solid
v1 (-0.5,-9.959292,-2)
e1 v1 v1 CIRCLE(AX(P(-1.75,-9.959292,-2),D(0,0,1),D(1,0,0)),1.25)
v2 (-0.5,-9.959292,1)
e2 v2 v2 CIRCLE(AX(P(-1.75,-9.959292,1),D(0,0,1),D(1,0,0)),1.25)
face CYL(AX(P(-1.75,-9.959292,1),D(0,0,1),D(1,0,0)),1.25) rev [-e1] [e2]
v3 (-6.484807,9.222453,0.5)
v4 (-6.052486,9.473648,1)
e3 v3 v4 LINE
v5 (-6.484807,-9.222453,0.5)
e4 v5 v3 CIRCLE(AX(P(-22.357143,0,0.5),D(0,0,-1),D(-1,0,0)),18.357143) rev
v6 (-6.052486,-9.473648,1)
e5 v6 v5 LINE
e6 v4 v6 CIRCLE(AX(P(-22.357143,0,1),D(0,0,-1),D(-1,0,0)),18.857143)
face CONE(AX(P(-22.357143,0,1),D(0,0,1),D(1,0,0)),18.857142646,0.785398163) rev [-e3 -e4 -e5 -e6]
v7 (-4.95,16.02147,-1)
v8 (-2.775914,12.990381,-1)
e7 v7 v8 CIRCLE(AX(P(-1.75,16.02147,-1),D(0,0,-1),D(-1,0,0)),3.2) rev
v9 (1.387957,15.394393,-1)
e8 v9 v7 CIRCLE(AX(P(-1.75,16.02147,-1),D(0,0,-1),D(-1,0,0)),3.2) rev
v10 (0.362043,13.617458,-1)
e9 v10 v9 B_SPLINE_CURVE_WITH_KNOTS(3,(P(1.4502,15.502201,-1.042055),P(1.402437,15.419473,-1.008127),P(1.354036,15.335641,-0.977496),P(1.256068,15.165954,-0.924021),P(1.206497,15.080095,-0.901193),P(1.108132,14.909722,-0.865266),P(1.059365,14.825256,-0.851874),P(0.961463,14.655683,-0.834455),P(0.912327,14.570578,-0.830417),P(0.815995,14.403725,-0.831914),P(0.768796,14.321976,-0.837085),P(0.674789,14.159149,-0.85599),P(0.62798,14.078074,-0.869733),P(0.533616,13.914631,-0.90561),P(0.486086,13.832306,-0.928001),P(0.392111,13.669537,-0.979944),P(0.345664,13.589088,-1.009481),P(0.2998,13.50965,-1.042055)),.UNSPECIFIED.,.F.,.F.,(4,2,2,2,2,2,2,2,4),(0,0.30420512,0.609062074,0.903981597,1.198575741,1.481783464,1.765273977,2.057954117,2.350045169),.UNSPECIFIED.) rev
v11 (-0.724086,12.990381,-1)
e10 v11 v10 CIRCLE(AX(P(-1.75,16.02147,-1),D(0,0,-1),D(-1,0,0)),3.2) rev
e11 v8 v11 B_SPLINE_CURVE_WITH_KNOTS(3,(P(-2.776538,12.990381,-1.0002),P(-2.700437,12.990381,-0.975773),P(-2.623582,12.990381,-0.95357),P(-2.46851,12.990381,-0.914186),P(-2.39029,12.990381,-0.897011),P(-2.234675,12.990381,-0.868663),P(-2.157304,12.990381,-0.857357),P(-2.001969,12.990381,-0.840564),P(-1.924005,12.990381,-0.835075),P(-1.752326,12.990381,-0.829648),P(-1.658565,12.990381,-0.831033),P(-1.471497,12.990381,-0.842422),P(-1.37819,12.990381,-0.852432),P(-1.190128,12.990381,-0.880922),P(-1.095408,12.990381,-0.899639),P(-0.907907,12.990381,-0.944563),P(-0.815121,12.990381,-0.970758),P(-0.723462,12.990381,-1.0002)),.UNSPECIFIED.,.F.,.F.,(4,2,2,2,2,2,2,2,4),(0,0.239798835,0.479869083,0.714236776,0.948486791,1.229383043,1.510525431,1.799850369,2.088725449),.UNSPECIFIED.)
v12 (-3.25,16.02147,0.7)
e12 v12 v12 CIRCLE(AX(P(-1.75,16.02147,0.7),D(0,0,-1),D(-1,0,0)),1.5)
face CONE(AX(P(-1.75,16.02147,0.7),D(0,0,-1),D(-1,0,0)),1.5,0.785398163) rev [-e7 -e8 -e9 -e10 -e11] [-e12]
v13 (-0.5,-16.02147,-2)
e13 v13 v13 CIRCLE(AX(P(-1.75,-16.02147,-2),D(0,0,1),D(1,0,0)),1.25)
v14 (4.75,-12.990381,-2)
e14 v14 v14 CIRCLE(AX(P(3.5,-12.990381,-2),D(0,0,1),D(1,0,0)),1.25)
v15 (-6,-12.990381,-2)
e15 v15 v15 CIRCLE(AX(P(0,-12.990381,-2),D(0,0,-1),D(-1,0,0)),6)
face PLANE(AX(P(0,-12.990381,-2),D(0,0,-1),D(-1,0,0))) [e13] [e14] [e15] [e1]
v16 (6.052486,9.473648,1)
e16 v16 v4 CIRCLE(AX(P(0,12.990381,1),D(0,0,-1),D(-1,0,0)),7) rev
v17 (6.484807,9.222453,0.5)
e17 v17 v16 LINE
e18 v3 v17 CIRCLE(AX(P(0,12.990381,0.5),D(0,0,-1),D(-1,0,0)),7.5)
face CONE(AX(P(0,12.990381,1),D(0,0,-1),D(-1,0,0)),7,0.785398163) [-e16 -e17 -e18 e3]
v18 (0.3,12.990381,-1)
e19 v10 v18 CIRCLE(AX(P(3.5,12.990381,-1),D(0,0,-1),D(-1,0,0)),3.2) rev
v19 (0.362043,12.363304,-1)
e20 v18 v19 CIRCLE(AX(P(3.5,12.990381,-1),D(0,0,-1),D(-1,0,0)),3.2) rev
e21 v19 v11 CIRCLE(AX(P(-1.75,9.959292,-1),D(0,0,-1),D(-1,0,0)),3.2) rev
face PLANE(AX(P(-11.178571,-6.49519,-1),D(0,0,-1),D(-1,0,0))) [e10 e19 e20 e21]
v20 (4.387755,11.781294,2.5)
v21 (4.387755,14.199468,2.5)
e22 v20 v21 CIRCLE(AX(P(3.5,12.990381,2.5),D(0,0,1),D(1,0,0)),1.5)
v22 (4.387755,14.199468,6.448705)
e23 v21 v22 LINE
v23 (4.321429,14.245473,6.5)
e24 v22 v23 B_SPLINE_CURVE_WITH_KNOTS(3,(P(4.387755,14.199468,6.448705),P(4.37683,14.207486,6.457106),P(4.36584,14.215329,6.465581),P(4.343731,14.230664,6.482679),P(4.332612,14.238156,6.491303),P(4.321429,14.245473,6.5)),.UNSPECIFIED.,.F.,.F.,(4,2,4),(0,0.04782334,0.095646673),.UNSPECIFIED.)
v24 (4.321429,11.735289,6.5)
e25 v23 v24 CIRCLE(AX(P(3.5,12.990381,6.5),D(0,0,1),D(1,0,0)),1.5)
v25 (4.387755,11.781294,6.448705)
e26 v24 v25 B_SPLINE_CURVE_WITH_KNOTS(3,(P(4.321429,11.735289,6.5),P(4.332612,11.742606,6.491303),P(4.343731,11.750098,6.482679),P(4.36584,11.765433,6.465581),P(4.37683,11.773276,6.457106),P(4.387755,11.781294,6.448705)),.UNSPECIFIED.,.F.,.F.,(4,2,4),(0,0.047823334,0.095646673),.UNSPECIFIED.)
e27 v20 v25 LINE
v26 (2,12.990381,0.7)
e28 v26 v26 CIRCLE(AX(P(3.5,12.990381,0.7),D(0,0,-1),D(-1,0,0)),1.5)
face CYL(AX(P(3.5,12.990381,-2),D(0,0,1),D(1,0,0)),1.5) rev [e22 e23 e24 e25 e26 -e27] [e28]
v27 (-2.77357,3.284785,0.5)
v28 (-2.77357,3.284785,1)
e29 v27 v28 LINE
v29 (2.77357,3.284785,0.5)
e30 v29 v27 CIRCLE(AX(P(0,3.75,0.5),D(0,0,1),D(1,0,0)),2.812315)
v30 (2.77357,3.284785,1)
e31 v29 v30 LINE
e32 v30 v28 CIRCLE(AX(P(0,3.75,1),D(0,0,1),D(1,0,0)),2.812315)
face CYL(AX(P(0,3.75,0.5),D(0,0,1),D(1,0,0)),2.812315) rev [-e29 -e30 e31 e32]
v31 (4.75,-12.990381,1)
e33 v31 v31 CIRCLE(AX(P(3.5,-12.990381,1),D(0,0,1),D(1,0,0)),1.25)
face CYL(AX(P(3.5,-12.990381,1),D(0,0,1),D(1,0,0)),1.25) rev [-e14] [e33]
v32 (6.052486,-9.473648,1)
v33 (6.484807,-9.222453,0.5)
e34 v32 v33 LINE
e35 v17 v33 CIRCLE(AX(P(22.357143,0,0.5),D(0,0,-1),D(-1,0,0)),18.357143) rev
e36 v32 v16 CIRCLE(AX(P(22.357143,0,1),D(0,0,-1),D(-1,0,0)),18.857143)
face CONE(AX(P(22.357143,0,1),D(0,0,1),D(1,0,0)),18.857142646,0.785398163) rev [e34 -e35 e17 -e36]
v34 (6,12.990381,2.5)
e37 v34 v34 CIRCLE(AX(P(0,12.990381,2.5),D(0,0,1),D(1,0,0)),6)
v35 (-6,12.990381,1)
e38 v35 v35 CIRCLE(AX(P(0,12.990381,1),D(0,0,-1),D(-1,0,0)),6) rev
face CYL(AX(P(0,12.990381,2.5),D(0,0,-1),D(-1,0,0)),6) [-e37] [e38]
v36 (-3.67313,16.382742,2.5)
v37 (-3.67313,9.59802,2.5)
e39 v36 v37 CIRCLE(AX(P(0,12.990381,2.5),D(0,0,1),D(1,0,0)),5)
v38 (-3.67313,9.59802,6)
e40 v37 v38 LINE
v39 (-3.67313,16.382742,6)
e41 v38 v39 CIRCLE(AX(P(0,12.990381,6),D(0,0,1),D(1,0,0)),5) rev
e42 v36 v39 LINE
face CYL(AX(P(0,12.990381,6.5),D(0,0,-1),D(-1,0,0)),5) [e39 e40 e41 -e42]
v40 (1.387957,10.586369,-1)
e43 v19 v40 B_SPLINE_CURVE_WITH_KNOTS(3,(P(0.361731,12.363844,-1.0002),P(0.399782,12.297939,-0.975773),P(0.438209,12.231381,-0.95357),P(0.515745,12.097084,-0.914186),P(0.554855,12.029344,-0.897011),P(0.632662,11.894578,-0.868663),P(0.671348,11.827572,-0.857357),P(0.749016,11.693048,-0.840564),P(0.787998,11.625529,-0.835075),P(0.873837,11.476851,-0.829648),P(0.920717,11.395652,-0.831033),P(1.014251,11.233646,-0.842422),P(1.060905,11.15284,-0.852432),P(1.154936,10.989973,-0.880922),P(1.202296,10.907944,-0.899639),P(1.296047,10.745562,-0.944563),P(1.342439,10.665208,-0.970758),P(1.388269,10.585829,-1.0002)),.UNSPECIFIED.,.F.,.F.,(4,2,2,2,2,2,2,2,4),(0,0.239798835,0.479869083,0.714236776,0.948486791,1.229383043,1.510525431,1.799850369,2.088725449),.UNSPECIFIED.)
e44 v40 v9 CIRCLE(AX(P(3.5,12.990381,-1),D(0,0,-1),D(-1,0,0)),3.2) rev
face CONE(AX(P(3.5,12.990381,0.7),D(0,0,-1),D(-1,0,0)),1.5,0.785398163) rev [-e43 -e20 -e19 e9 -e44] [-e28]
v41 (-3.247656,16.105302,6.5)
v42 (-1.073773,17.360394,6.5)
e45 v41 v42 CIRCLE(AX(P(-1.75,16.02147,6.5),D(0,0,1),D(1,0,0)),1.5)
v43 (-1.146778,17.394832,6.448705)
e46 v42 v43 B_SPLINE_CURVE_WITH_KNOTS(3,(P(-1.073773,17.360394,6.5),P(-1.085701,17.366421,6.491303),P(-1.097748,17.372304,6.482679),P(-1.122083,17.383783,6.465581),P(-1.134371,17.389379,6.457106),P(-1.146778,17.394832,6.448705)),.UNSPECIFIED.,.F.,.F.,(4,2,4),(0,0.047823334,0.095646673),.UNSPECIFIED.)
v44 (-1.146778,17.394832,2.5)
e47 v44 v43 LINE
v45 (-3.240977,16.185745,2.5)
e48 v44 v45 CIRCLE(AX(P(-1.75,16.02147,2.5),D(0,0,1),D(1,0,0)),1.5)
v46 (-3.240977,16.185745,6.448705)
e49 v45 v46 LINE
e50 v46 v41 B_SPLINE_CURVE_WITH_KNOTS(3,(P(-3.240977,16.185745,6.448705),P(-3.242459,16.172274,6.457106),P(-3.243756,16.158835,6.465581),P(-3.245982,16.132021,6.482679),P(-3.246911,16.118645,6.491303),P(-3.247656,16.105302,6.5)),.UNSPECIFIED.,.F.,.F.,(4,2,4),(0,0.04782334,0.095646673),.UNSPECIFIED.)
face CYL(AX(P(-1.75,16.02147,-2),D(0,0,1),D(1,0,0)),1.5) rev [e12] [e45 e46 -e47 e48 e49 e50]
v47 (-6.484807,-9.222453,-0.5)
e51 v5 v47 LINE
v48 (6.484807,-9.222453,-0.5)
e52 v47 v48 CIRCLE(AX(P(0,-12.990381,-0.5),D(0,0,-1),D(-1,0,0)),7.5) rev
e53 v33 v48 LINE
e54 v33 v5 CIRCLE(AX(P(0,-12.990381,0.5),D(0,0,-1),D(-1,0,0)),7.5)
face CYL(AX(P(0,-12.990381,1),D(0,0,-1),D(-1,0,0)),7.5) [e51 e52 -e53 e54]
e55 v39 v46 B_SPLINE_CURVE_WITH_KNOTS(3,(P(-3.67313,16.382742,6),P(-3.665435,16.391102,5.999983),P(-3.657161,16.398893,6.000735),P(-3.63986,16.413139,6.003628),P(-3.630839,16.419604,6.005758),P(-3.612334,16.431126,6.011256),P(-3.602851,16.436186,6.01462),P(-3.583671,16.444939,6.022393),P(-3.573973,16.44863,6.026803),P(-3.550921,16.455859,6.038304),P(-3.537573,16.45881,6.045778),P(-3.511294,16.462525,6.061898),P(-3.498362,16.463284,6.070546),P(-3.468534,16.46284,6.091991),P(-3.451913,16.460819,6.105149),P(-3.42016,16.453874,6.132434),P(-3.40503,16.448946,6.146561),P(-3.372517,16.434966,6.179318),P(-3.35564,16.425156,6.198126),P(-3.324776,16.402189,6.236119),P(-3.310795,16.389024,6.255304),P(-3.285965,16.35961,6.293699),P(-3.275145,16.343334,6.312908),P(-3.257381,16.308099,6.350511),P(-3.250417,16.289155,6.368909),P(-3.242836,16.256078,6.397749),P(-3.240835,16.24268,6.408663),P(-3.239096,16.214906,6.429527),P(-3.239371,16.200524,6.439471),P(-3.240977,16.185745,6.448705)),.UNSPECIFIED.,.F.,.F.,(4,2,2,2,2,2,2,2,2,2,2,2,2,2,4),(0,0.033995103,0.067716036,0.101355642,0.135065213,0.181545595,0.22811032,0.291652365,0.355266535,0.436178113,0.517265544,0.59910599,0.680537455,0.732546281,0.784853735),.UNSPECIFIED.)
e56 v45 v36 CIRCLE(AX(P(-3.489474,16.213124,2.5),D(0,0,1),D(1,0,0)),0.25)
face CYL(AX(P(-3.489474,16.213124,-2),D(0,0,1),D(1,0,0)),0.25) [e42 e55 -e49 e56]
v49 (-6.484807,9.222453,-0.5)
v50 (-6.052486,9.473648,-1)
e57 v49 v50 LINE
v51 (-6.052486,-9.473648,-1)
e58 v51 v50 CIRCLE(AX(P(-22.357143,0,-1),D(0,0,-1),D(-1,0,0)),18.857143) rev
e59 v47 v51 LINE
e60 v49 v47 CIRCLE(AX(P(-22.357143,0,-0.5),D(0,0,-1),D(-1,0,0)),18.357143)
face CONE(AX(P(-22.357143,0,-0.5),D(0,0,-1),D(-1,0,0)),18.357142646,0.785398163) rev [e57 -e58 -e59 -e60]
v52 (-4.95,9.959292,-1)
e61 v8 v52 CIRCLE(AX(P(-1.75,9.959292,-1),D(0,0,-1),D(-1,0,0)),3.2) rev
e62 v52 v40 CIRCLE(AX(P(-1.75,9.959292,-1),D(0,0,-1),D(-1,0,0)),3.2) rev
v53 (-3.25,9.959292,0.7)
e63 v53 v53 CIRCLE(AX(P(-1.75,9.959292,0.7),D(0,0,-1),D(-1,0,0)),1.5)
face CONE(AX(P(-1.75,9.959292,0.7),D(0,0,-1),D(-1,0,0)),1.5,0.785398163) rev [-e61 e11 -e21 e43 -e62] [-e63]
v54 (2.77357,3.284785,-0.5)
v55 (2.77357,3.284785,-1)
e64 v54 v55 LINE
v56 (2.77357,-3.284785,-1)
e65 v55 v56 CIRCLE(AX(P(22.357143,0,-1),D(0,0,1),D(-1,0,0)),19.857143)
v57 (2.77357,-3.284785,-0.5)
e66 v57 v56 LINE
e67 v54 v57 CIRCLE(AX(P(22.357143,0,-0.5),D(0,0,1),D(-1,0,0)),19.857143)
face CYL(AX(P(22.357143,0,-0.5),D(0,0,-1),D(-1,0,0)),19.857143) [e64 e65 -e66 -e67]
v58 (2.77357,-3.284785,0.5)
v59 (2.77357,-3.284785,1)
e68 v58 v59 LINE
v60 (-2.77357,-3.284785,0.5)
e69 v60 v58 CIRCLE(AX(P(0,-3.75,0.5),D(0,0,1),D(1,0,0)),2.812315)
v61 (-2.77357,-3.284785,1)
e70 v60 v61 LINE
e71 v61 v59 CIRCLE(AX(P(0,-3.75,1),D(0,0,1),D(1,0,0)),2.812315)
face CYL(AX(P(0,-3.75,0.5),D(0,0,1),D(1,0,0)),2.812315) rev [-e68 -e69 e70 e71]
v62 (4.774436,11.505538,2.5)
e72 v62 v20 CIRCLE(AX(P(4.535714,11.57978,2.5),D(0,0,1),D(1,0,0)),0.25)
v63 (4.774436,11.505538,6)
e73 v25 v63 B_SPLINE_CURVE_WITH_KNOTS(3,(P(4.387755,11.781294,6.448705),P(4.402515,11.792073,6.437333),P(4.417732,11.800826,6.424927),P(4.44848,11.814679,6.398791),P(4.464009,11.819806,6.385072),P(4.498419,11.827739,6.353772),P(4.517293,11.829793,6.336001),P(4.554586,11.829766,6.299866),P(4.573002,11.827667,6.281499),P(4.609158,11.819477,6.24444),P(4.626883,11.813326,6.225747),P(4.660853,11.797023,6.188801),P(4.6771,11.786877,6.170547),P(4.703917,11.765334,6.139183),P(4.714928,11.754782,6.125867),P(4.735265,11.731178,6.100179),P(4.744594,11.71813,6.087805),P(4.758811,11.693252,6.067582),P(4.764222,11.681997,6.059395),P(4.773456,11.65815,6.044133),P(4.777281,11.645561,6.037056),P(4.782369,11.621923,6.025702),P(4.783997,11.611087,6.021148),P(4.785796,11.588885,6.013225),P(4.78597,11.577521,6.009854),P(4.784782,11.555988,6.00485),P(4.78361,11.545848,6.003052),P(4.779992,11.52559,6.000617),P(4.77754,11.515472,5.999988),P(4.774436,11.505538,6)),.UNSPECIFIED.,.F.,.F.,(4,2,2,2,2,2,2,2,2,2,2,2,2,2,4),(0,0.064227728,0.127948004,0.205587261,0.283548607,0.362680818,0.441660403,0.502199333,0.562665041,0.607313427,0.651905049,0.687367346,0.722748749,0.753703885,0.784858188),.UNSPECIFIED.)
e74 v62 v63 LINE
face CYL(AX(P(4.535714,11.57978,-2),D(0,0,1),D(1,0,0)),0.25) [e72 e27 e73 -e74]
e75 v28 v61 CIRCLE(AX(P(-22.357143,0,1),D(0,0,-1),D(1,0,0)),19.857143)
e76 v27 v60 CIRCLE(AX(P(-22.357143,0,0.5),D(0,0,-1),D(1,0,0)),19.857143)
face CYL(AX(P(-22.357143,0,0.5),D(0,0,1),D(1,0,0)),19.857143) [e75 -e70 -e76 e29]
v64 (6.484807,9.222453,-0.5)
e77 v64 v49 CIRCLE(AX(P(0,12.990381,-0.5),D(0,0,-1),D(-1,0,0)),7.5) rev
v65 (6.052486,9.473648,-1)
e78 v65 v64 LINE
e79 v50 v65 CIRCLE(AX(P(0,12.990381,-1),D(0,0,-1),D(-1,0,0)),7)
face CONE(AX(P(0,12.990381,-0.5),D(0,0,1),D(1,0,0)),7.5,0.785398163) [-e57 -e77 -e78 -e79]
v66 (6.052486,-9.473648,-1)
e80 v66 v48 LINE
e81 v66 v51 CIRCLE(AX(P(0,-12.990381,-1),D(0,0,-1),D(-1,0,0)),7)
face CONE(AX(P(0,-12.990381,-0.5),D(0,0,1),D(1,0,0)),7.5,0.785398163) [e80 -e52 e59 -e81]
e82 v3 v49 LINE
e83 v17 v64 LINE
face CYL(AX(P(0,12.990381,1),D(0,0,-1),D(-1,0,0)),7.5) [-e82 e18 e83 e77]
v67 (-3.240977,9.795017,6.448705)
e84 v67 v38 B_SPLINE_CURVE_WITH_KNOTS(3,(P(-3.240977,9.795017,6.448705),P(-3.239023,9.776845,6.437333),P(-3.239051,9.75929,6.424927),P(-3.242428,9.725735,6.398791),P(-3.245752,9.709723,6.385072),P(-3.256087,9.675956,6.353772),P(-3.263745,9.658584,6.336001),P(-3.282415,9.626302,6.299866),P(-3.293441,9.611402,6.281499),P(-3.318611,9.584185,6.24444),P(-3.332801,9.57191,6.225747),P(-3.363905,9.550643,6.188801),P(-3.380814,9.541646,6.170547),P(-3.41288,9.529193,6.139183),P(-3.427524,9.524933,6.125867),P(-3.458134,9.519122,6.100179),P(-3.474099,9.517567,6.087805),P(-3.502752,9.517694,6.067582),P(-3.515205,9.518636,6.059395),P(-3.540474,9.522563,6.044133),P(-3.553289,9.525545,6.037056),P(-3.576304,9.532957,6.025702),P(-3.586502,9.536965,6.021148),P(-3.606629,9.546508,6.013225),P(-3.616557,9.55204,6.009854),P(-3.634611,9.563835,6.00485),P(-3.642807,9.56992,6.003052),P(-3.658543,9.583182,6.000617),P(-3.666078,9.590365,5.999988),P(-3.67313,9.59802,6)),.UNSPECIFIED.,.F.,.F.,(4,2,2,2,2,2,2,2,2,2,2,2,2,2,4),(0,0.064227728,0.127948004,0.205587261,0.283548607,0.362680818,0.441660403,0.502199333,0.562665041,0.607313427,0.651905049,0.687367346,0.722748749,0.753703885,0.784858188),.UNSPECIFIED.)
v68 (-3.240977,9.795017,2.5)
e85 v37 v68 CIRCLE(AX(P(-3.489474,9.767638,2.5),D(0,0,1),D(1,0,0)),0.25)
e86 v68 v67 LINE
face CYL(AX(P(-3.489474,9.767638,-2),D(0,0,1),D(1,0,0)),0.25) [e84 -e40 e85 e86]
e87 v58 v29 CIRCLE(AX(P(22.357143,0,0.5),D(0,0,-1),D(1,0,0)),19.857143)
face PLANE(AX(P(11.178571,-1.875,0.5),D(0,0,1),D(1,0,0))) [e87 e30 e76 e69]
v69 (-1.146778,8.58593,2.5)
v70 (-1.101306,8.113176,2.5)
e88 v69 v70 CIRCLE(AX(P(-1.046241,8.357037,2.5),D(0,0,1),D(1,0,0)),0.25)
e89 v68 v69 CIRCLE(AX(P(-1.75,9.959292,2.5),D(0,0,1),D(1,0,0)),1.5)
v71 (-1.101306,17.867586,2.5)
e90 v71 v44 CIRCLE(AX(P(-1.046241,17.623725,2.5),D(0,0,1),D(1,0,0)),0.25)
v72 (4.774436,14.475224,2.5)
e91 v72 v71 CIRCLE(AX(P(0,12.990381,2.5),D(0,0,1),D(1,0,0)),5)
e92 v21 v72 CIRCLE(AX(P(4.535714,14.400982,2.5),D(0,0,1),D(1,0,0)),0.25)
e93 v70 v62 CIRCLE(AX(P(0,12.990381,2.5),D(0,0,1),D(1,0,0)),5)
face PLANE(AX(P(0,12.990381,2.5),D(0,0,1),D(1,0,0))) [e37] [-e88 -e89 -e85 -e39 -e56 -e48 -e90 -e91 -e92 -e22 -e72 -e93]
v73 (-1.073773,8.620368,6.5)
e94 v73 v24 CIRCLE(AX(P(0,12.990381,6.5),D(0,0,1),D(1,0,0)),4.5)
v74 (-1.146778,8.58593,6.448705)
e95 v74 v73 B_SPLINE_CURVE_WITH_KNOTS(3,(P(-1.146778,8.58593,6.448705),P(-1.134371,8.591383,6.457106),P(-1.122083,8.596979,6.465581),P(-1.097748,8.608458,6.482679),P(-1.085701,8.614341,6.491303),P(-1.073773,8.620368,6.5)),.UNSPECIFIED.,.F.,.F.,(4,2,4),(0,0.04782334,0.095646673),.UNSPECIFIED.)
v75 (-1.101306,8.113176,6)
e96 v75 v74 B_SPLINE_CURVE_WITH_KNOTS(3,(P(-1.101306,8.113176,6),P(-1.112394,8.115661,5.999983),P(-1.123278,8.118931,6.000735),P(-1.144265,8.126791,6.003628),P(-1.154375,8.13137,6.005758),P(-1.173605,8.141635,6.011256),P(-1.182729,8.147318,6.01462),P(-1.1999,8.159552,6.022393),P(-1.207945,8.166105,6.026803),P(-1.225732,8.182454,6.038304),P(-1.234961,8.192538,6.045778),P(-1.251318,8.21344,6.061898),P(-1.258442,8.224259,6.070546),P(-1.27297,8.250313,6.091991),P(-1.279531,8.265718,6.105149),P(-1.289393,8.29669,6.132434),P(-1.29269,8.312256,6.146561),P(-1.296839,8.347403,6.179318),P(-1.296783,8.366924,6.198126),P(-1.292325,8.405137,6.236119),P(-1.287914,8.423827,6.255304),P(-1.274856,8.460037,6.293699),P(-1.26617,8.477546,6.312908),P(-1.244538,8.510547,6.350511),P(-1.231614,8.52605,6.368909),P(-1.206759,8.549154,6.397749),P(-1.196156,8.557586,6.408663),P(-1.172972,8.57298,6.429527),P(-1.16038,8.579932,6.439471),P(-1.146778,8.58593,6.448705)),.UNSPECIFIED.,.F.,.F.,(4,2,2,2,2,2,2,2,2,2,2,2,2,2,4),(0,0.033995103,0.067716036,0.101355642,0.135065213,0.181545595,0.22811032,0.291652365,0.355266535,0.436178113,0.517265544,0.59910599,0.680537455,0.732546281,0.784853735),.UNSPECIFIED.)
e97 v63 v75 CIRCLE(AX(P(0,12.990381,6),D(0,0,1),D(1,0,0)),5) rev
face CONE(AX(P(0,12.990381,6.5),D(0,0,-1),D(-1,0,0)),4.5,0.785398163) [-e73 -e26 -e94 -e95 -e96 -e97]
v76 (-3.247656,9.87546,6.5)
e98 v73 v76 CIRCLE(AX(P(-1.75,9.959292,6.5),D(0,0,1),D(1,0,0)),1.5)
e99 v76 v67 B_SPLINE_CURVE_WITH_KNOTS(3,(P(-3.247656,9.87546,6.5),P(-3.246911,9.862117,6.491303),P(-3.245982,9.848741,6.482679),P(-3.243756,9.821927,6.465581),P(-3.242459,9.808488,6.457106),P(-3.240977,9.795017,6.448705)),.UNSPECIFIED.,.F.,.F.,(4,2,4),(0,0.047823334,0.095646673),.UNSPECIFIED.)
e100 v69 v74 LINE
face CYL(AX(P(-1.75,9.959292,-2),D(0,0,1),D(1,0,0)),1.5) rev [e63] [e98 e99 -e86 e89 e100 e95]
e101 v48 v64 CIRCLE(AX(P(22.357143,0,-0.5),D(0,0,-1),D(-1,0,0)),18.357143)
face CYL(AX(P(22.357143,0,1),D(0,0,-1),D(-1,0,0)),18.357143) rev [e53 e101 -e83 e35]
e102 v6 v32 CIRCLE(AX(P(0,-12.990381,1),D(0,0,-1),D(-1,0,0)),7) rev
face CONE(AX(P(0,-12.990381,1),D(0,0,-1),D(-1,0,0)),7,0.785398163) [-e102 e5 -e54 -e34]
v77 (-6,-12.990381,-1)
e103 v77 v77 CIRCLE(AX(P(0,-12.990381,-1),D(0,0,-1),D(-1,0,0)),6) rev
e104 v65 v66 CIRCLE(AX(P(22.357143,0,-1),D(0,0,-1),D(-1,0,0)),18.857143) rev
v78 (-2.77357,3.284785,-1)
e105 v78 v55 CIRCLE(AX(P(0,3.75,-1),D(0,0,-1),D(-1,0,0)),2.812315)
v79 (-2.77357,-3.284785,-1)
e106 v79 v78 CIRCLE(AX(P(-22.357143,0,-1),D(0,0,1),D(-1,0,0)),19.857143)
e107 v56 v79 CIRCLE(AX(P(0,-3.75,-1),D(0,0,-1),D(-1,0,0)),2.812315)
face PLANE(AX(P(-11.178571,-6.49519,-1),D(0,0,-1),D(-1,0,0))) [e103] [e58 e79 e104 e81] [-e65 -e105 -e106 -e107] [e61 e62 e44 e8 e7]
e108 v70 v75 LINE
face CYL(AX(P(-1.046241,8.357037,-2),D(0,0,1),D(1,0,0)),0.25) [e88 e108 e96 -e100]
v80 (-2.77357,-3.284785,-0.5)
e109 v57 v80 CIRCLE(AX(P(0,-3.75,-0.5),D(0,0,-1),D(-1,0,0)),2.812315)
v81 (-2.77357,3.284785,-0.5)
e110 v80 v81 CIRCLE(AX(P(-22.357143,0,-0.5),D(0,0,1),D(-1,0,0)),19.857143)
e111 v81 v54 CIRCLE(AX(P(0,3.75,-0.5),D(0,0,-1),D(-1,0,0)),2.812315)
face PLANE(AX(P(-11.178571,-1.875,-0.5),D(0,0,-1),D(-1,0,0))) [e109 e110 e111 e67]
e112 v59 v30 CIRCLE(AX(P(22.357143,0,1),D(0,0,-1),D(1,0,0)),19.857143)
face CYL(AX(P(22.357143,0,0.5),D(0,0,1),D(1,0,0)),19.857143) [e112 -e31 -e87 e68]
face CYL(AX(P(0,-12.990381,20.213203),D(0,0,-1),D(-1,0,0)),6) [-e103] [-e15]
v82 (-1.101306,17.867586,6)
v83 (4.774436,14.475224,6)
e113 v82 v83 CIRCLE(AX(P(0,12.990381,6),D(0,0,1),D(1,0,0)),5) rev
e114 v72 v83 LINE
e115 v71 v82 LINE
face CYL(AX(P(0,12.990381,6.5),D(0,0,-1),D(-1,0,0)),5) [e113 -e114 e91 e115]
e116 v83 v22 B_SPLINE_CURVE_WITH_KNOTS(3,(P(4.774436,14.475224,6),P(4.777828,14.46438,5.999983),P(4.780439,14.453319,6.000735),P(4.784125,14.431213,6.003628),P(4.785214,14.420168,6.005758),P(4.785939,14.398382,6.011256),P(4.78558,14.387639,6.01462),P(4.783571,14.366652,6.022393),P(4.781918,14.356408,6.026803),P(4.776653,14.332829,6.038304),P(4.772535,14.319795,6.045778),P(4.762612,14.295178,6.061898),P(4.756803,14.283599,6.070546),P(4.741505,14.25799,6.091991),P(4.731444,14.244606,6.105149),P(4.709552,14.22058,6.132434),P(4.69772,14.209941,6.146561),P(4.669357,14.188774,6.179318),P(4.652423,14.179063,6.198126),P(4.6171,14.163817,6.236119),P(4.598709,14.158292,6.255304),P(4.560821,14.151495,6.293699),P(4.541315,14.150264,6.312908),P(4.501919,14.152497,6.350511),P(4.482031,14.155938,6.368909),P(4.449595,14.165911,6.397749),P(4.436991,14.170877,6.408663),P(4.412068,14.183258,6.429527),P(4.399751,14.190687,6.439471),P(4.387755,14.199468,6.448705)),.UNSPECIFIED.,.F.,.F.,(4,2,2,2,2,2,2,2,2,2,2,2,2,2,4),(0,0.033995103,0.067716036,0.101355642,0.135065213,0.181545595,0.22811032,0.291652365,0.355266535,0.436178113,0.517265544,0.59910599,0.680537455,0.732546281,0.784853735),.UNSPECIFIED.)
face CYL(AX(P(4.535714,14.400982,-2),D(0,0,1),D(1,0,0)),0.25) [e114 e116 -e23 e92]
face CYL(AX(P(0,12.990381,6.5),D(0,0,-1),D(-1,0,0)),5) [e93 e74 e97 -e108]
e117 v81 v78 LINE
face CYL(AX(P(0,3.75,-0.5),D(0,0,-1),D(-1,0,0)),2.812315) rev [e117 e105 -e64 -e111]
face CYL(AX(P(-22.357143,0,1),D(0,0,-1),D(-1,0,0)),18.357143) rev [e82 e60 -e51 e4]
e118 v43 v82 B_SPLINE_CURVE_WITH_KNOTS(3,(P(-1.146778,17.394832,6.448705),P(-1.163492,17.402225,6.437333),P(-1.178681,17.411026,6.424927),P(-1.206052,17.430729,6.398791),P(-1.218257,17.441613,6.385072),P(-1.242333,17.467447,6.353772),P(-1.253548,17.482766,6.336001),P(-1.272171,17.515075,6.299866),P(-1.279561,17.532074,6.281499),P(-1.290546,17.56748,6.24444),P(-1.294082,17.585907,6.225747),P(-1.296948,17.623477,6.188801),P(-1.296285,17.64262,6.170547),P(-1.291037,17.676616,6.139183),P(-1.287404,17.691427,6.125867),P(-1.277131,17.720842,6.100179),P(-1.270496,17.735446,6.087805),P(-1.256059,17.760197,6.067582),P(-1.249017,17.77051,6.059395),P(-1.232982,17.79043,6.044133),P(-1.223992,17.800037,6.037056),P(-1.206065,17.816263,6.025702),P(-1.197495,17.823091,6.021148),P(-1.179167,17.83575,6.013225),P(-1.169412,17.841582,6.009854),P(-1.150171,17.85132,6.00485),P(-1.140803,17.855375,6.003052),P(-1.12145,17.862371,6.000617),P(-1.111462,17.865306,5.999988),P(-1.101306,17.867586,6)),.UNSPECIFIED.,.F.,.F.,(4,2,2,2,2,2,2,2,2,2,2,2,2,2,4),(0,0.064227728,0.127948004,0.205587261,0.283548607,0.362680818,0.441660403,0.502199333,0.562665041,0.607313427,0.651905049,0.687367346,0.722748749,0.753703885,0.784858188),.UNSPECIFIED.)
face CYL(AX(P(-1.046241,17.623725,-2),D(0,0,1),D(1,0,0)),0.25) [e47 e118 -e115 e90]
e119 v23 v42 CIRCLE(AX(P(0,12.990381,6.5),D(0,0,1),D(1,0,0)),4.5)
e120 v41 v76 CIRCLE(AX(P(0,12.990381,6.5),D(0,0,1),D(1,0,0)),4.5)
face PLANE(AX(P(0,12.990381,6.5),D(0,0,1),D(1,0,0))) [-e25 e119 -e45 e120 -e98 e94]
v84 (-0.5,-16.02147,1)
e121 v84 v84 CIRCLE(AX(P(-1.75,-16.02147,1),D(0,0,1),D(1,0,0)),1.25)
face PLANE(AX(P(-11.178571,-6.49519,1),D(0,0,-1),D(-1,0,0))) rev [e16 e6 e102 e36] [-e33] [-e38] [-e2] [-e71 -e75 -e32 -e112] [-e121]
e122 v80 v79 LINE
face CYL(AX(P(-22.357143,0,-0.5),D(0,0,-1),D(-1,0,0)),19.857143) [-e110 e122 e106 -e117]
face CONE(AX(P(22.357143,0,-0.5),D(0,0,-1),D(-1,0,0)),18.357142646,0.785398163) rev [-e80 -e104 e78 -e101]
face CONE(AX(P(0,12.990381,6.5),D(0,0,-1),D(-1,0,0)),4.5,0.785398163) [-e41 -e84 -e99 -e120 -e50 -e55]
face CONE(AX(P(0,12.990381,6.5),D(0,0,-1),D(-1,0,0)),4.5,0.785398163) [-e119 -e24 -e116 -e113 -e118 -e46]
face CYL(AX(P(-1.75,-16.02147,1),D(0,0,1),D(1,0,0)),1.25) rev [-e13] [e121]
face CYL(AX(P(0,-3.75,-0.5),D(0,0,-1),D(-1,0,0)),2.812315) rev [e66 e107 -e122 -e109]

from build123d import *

# Parameters (mm, degrees)
EXTRUDE_1_DEPTH     = 1
SKETCH_2_R          = 6
EXTRUDE_2_DEPTH     = 1.5
SKETCH_3_R          = 7.5
EXTRUDE_3_DEPTH     = 1
SKETCH_4_R          = 5
EXTRUDE_4_DEPTH     = 4
CUT_EXTRUDE_2_DEPTH = 24.416996253
EXTRUDE_START       = -3.5
SKETCH_13_R         = 6
EXTRUDE_7_DEPTH     = 3.5
EXTRUDE_START_2     = -3
SKETCH_14_R         = 7.5
SKETCH_14_R_2       = 1.5
EXTRUDE_8_DEPTH     = 3
SKETCH_18_R         = 1.5
CUT_EXTRUDE_3_DEPTH = 23.279042024
SKETCH_19_R         = 1.5
SKETCH_19_R_2       = 1
EXTRUDE_9_DEPTH     = 3
M3X0_5_1_D          = 2.5
CUT_EXTRUDE_START   = -1
SKETCH_22_R         = 7.5
SKETCH_22_R_2       = 6
CUT_EXTRUDE_4_DEPTH = 1
CHAMFER_1_SIZE      = 1.7
CHAMFER_2_SIZE      = 0.5
CUT_EXTRUDE_5_DEPTH = 0.5
CUT_EXTRUDE_START_2 = -0.5
CUT_EXTRUDE_6_DEPTH = 0.5


with BuildPart() as part:
    # ｽｹｯﾁ1 → ﾎﾞｽ - 押し出し1 (new, symmetric)
    with BuildSketch(Plane.XY):
        with BuildLine():
            ThreePointArc((6.484806622, 9.222452779), (0, 20.490381), (-6.484806622, 9.222452779))
            ThreePointArc((-6.484806622, 9.222452779), (-4, 0), (-6.484806622, -9.222452779))
            ThreePointArc((-6.484806622, -9.222452779), (0, -20.490381), (6.484806622, -9.222452779))
            ThreePointArc((6.484806622, -9.222452779), (4, 0), (6.484806622, 9.222452779))
        make_face()
    extrude(amount=EXTRUDE_1_DEPTH, both=True)

    # ｽｹｯﾁ2 → ﾎﾞｽ - 押し出し2 (add)
    with BuildSketch(Plane.XY.offset(1)):
        with Locations(Location((0, 12.990381, 0), (0, 0, 180))):
            Circle(SKETCH_2_R)
    extrude(amount=EXTRUDE_2_DEPTH)

    # ｽｹｯﾁ3 → ﾎﾞｽ - 押し出し3 (add)
    with BuildSketch(Plane(origin=(0, 0, -1), x_dir=(-1, 0, 0), z_dir=(0, 0, -1))):
        with Locations((0, -12.990381)):
            Circle(SKETCH_3_R)
    extrude(amount=EXTRUDE_3_DEPTH)

    # ｽｹｯﾁ4 → ﾎﾞｽ - 押し出し4 (add)
    with BuildSketch(Plane.XY.offset(2.5)):
        with Locations((0, 12.990381)):
            Circle(SKETCH_4_R)
    extrude(amount=EXTRUDE_4_DEPTH)

    # ｽｹｯﾁ10 → ｶｯﾄ - 押し出し2 (cut, through all)
    with BuildSketch(Plane.XY.offset(6.5)):
        with BuildLine():
            ThreePointArc((-3.240977431, 16.185744986), (-1, 14.722431808), (-1.146777671, 17.394831782))
            ThreePointArc((-1.146777671, 17.394831782), (-1.295092138, 17.647661172), (-1.101305912, 17.867585659))
            ThreePointArc((-1.101305912, 17.867585659), (-2.5, 17.320508019), (-3.673130179, 16.382742226))
            ThreePointArc((-3.673130179, 16.382742226), (-3.385776872, 16.440603778), (-3.240977431, 16.185744986))
        make_face()
        with BuildLine():
            ThreePointArc((4.387755102, 14.199467795), (2, 12.990381), (4.387755102, 11.781294205))
            ThreePointArc((4.387755102, 11.781294205), (4.68086901, 11.783323606), (4.77443609, 11.505537567))
            ThreePointArc((4.77443609, 11.505537567), (5, 12.990381), (4.77443609, 14.475224433))
            ThreePointArc((4.77443609, 14.475224433), (4.68086901, 14.197438394), (4.387755102, 14.199467795))
        make_face()
        with BuildLine():
            ThreePointArc((-1.146777671, 8.585930218), (-1, 11.258330192), (-3.240977431, 9.795017014))
            ThreePointArc((-3.240977431, 9.795017014), (-3.385776872, 9.540158222), (-3.673130179, 9.598019774))
            ThreePointArc((-3.673130179, 9.598019774), (-2.5, 8.660253981), (-1.101305912, 8.113176341))
            ThreePointArc((-1.101305912, 8.113176341), (-1.295092138, 8.333100828), (-1.146777671, 8.585930218))
        make_face()
        with BuildLine():
            ThreePointArc((-3.673130179, -9.598019774), (-2.5, -8.660253981), (-1.101305912, -8.113176341))
            ThreePointArc((-1.101305912, -8.113176341), (-1.295092138, -8.333100828), (-1.146777671, -8.585930218))
            ThreePointArc((-1.146777671, -8.585930218), (-1, -11.258330192), (-3.240977431, -9.795017014))
            ThreePointArc((-3.240977431, -9.795017014), (-3.385776872, -9.540158222), (-3.673130179, -9.598019774))
        make_face()
        with BuildLine():
            ThreePointArc((4.77443609, -11.505537567), (5, -12.990381), (4.77443609, -14.475224433))
            ThreePointArc((4.77443609, -14.475224433), (4.68086901, -14.197438394), (4.387755102, -14.199467795))
            ThreePointArc((4.387755102, -14.199467795), (2, -12.990381), (4.387755102, -11.781294205))
            ThreePointArc((4.387755102, -11.781294205), (4.68086901, -11.783323606), (4.77443609, -11.505537567))
        make_face()
        with BuildLine():
            ThreePointArc((-1.101305912, -17.867585659), (-2.5, -17.320508019), (-3.673130179, -16.382742226))
            ThreePointArc((-3.673130179, -16.382742226), (-3.385776872, -16.440603778), (-3.240977431, -16.185744986))
            ThreePointArc((-3.240977431, -16.185744986), (-1, -14.722431808), (-1.146777671, -17.394831782))
            ThreePointArc((-1.146777671, -17.394831782), (-1.295092138, -17.647661172), (-1.101305912, -17.867585659))
        make_face()
    extrude(amount=-CUT_EXTRUDE_2_DEPTH, mode=Mode.SUBTRACT)

    # ｽｹｯﾁ13 → ﾎﾞｽ - 押し出し7 (add)
    with BuildSketch(Plane.XY.offset(2.5).offset(EXTRUDE_START)):
        with Locations(Location((0, 12.990381, 0), (0, 0, 180))):
            Circle(SKETCH_13_R)
    extrude(amount=EXTRUDE_7_DEPTH)

    # ｽｹｯﾁ14 → ﾎﾞｽ - 押し出し8 (add)
    with BuildSketch(Plane(origin=(0, 0, -2), x_dir=(-1, 0, 0), z_dir=(0, 0, -1)).offset(EXTRUDE_START_2)):
        with Locations((0, -12.990381)):
            Circle(SKETCH_14_R)
        with Locations((1.75, -9.959292087)):
            Circle(SKETCH_14_R_2, mode=Mode.SUBTRACT)
        with Locations((1.75, -16.021469913)):
            Circle(SKETCH_14_R_2, mode=Mode.SUBTRACT)
        with Locations((-3.5, -12.990381)):
            Circle(SKETCH_14_R_2, mode=Mode.SUBTRACT)
    extrude(amount=EXTRUDE_8_DEPTH)

    # ｽｹｯﾁ18 → ｶｯﾄ - 押し出し3 (cut, through all)
    with BuildSketch(Plane.XY.offset(2.5)):
        with Locations(Location((3.5, 12.990381, 0), (0, 0, 53.712542915))):
            Circle(SKETCH_18_R)
        with Locations(Location((-1.75, 16.021469913, 0), (0, 0, 66.287457085))):
            Circle(SKETCH_18_R)
        with Locations(Location((-1.75, 9.959292087, 0), (0, 0, 293.712542915))):
            Circle(SKETCH_18_R)
    extrude(amount=-CUT_EXTRUDE_3_DEPTH, mode=Mode.SUBTRACT)

    # ｽｹｯﾁ19 → ﾎﾞｽ - 押し出し9 (add)
    # profile 1 of 3: a face of its own
    with BuildSketch(Plane(origin=(0, 0, -2), x_dir=(-1, 0, 0), z_dir=(0, 0, -1)).offset(EXTRUDE_START_2)):
        with Locations((1.75, -9.959292087)):
            Circle(SKETCH_19_R)
        with Locations((1.75, -9.959292087)):
            Circle(SKETCH_19_R_2, mode=Mode.SUBTRACT)
    # profile 2 of 3: a face of its own
    with BuildSketch(Plane(origin=(0, 0, -2), x_dir=(-1, 0, 0), z_dir=(0, 0, -1)).offset(EXTRUDE_START_2)):
        with Locations((1.75, -16.021469913)):
            Circle(SKETCH_19_R)
        with Locations((1.75, -16.021469913)):
            Circle(SKETCH_19_R_2, mode=Mode.SUBTRACT)
    # profile 3 of 3: a face of its own
    with BuildSketch(Plane(origin=(0, 0, -2), x_dir=(-1, 0, 0), z_dir=(0, 0, -1)).offset(EXTRUDE_START_2)):
        with Locations((-3.5, -12.990381)):
            Circle(SKETCH_19_R)
        with Locations((-3.5, -12.990381)):
            Circle(SKETCH_19_R_2, mode=Mode.SUBTRACT)
    extrude(amount=EXTRUDE_9_DEPTH)

    # M3x0.5 ねじ穴1 (through all)
    with Locations(Plane.XY.offset(1)):
        with Locations((-1.75, -9.959292087), (-1.75, -16.021469913), (3.5, -12.990381)):
            Hole(M3X0_5_1_D / 2)

    # ｽｹｯﾁ22 → ｶｯﾄ - 押し出し4 (cut)
    with BuildSketch(Plane(origin=(0, 0, -2), x_dir=(-1, 0, 0), z_dir=(0, 0, -1)).offset(CUT_EXTRUDE_START)):
        with Locations((0, -12.990381)):
            Circle(SKETCH_22_R)
        with Locations((0, -12.990381)):
            Circle(SKETCH_22_R_2, mode=Mode.SUBTRACT)
    extrude(amount=CUT_EXTRUDE_4_DEPTH, mode=Mode.SUBTRACT)

    # 面取り1
    # the kernel refuses this chamfer: 1.7 mm, written as the material it takes off along each edge
    with BuildSketch(Plane(origin=(3.5, 12.990381, -1), x_dir=(0.5918367346923316, 0.8060578635983391, 0), z_dir=(0.8060578635983391, -0.5918367346923316, 0))) as chamfer_1_piece_1:
        Polygon((1.5, CHAMFER_1_SIZE), (1.5 + CHAMFER_1_SIZE, 0), (1.5, 0), align=None)
    revolve(axis=Axis((3.5, 12.990381, -1), (0, 0, 1)), mode=Mode.SUBTRACT)
    with BuildSketch(Plane(origin=(-1.75, 16.021469913, -1), x_dir=(0.40214821945020784, 0.9155745789355596, 0), z_dir=(0.9155745789355596, -0.40214821945020784, 0))) as chamfer_1_piece_2:
        Polygon((1.5, CHAMFER_1_SIZE), (1.5 + CHAMFER_1_SIZE, 0), (1.5, 0), align=None)
    revolve(axis=Axis((-1.75, 16.021469913, -1), (0, 0, 1)), mode=Mode.SUBTRACT)
    with BuildSketch(Plane(origin=(-1.75, 9.959292087, -1), x_dir=(0.40214821945020723, -0.9155745789355599, 0), z_dir=(-0.9155745789355599, -0.40214821945020723, 0))) as chamfer_1_piece_3:
        Polygon((1.5, CHAMFER_1_SIZE), (1.5 + CHAMFER_1_SIZE, 0), (1.5, 0), align=None)
    revolve(axis=Axis((-1.75, 9.959292087, -1), (0, 0, 1)), mode=Mode.SUBTRACT)

    # 面取り2
    # the kernel refuses this chamfer: 0.5 mm, written as the material it takes off along each edge
    with BuildSketch(Plane(origin=(-22.357142646, 0, -1), x_dir=(0.8646408828749567, 0.502390429507983, 0), z_dir=(-0.502390429507983, 0.8646408828749567, 0))) as chamfer_2_piece_1:
        Polygon((18.357142646, -CHAMFER_2_SIZE), (18.357142646 + CHAMFER_2_SIZE, 0), (18.357142646, 0), align=None)
    revolve(axis=Axis((-22.357142646, 0, -1), (0, 0, -1)), revolution_arc=60.316551922, mode=Mode.SUBTRACT)
    with BuildSketch(Plane(origin=(-22.357142646, 0, 1), x_dir=(0.8646408828749567, 0.502390429507983, 0), z_dir=(-0.502390429507983, 0.8646408828749567, 0))) as chamfer_2_piece_2:
        Polygon((18.357142646, CHAMFER_2_SIZE), (18.357142646 + CHAMFER_2_SIZE, 0), (18.357142646, 0), align=None)
    revolve(axis=Axis((-22.357142646, 0, 1), (0, 0, -1)), revolution_arc=60.316551922, mode=Mode.SUBTRACT)
    with BuildSketch(Plane(origin=(0, 12.990381, -1), x_dir=(0.8646408828749568, -0.5023904295079827, 0), z_dir=(-0.5023904295079827, -0.8646408828749568, 0))) as chamfer_2_piece_3:
        Polygon((7.5 - CHAMFER_2_SIZE, 0), (7.5, CHAMFER_2_SIZE), (7.5, 0), align=None)
    revolve(axis=Axis((0, 12.990381, -1), (0, 0, 1)), revolution_arc=240.316551922, mode=Mode.SUBTRACT)
    with BuildSketch(Plane(origin=(22.357142646, 0, -1), x_dir=(-0.8646408828749562, -0.5023904295079837, 0), z_dir=(0.5023904295079837, -0.8646408828749562, 0))) as chamfer_2_piece_4:
        Polygon((18.357142646 + CHAMFER_2_SIZE, 0), (18.357142646, -CHAMFER_2_SIZE), (18.357142646, 0), align=None)
    revolve(axis=Axis((22.357142646, 0, -1), (0, 0, -1)), revolution_arc=60.316551922, mode=Mode.SUBTRACT)
    with BuildSketch(Plane(origin=(0, -12.990381, -1), x_dir=(0.8646408828749563, 0.5023904295079835, 0), z_dir=(-0.5023904295079835, 0.8646408828749563, 0))) as chamfer_2_piece_5:
        Polygon((7.5 - CHAMFER_2_SIZE, 0), (7.5, -CHAMFER_2_SIZE), (7.5, 0), align=None)
    revolve(axis=Axis((0, -12.990381, -1), (0, 0, -1)), revolution_arc=240.316551922, mode=Mode.SUBTRACT)
    with BuildSketch(Plane(origin=(0, -12.990381, 1), x_dir=(0.8646408828749563, 0.5023904295079835, 0), z_dir=(-0.5023904295079835, 0.8646408828749563, 0))) as chamfer_2_piece_6:
        Polygon((7.5, CHAMFER_2_SIZE), (7.5 - CHAMFER_2_SIZE, 0), (7.5, 0), align=None)
    revolve(axis=Axis((0, -12.990381, 1), (0, 0, -1)), revolution_arc=240.316551922, mode=Mode.SUBTRACT)
    with BuildSketch(Plane(origin=(0, 12.990381, 1), x_dir=(0.8646408828749568, -0.5023904295079827, 0), z_dir=(-0.5023904295079827, -0.8646408828749568, 0))) as chamfer_2_piece_7:
        Polygon((7.5 - CHAMFER_2_SIZE, 0), (7.5, -CHAMFER_2_SIZE), (7.5, 0), align=None)
    revolve(axis=Axis((0, 12.990381, 1), (0, 0, 1)), revolution_arc=240.316551922, mode=Mode.SUBTRACT)
    with BuildSketch(Plane(origin=(22.357142646, 0, 1), x_dir=(-0.8646408828749562, -0.5023904295079837, 0), z_dir=(0.5023904295079837, -0.8646408828749562, 0))) as chamfer_2_piece_8:
        Polygon((18.357142646 + CHAMFER_2_SIZE, 0), (18.357142646, CHAMFER_2_SIZE), (18.357142646, 0), align=None)
    revolve(axis=Axis((22.357142646, 0, 1), (0, 0, -1)), revolution_arc=60.316551922, mode=Mode.SUBTRACT)
    with BuildSketch(Plane(origin=(0, 12.990381, 6.5), x_dir=(-0.46119688749448057, -0.8872978254032877, 0), z_dir=(-0.8872978254032877, 0.46119688749448057, 0))) as chamfer_2_piece_9:
        Polygon((5 - CHAMFER_2_SIZE, 0), (5, -CHAMFER_2_SIZE), (5, 0), align=None)
    revolve(axis=Axis((0, 12.990381, 6.5), (0, 0, 1)), revolution_arc=114.928734935, mode=Mode.SUBTRACT)
    with BuildSketch(Plane(origin=(0, 12.990381, 6.5), x_dir=(-0.5378240137746958, 0.8430571334181782, 0), z_dir=(0.8430571334181782, 0.5378240137746958, 0))) as chamfer_2_piece_10:
        Polygon((5 - CHAMFER_2_SIZE, 0), (5, -CHAMFER_2_SIZE), (5, 0), align=None)
    revolve(axis=Axis((0, 12.990381, 6.5), (0, 0, 1)), revolution_arc=114.928734935, mode=Mode.SUBTRACT)
    with BuildSketch(Plane(origin=(0, 12.990381, 6.5), x_dir=(0.9990209012691771, 0.044240691985109125, 0), z_dir=(0.044240691985109125, -0.9990209012691771, 0))) as chamfer_2_piece_11:
        Polygon((5 - CHAMFER_2_SIZE, 0), (5, -CHAMFER_2_SIZE), (5, 0), align=None)
    revolve(axis=Axis((0, 12.990381, 6.5), (0, 0, 1)), revolution_arc=114.928734935, mode=Mode.SUBTRACT)

    # ｽｹｯﾁ23 → ｶｯﾄ - 押し出し5 (cut)
    with BuildSketch(Plane.XY.offset(1)):
        with BuildLine():
            ThreePointArc((2.773570329, 3.284784525), (2.5, 0), (2.773570329, -3.284784525))
            ThreePointArc((2.773570329, -3.284784525), (0, -6.562315382), (-2.773570329, -3.284784525))
            ThreePointArc((-2.773570329, -3.284784525), (-2.5, 0), (-2.773570329, 3.284784525))
            ThreePointArc((-2.773570329, 3.284784525), (0, 6.562315382), (2.773570329, 3.284784525))
        make_face()
    extrude(amount=-CUT_EXTRUDE_5_DEPTH, mode=Mode.SUBTRACT)

    # ｽｹｯﾁ24 → ｶｯﾄ - 押し出し6 (cut)
    with BuildSketch(Plane(origin=(0, 0, -1), x_dir=(-1, 0, 0), z_dir=(0, 0, -1)).offset(CUT_EXTRUDE_START_2)):
        with BuildLine():
            ThreePointArc((-2.773570329, -3.284784525), (-2.5, 0), (-2.773570329, 3.284784525))
            ThreePointArc((-2.773570329, 3.284784525), (0, 6.562315382), (2.773570329, 3.284784525))
            ThreePointArc((2.773570329, 3.284784525), (2.5, 0), (2.773570329, -3.284784525))
            ThreePointArc((2.773570329, -3.284784525), (0, -6.562315382), (-2.773570329, -3.284784525))
        make_face()
    extrude(amount=CUT_EXTRUDE_6_DEPTH, mode=Mode.SUBTRACT)


solid = part.part
